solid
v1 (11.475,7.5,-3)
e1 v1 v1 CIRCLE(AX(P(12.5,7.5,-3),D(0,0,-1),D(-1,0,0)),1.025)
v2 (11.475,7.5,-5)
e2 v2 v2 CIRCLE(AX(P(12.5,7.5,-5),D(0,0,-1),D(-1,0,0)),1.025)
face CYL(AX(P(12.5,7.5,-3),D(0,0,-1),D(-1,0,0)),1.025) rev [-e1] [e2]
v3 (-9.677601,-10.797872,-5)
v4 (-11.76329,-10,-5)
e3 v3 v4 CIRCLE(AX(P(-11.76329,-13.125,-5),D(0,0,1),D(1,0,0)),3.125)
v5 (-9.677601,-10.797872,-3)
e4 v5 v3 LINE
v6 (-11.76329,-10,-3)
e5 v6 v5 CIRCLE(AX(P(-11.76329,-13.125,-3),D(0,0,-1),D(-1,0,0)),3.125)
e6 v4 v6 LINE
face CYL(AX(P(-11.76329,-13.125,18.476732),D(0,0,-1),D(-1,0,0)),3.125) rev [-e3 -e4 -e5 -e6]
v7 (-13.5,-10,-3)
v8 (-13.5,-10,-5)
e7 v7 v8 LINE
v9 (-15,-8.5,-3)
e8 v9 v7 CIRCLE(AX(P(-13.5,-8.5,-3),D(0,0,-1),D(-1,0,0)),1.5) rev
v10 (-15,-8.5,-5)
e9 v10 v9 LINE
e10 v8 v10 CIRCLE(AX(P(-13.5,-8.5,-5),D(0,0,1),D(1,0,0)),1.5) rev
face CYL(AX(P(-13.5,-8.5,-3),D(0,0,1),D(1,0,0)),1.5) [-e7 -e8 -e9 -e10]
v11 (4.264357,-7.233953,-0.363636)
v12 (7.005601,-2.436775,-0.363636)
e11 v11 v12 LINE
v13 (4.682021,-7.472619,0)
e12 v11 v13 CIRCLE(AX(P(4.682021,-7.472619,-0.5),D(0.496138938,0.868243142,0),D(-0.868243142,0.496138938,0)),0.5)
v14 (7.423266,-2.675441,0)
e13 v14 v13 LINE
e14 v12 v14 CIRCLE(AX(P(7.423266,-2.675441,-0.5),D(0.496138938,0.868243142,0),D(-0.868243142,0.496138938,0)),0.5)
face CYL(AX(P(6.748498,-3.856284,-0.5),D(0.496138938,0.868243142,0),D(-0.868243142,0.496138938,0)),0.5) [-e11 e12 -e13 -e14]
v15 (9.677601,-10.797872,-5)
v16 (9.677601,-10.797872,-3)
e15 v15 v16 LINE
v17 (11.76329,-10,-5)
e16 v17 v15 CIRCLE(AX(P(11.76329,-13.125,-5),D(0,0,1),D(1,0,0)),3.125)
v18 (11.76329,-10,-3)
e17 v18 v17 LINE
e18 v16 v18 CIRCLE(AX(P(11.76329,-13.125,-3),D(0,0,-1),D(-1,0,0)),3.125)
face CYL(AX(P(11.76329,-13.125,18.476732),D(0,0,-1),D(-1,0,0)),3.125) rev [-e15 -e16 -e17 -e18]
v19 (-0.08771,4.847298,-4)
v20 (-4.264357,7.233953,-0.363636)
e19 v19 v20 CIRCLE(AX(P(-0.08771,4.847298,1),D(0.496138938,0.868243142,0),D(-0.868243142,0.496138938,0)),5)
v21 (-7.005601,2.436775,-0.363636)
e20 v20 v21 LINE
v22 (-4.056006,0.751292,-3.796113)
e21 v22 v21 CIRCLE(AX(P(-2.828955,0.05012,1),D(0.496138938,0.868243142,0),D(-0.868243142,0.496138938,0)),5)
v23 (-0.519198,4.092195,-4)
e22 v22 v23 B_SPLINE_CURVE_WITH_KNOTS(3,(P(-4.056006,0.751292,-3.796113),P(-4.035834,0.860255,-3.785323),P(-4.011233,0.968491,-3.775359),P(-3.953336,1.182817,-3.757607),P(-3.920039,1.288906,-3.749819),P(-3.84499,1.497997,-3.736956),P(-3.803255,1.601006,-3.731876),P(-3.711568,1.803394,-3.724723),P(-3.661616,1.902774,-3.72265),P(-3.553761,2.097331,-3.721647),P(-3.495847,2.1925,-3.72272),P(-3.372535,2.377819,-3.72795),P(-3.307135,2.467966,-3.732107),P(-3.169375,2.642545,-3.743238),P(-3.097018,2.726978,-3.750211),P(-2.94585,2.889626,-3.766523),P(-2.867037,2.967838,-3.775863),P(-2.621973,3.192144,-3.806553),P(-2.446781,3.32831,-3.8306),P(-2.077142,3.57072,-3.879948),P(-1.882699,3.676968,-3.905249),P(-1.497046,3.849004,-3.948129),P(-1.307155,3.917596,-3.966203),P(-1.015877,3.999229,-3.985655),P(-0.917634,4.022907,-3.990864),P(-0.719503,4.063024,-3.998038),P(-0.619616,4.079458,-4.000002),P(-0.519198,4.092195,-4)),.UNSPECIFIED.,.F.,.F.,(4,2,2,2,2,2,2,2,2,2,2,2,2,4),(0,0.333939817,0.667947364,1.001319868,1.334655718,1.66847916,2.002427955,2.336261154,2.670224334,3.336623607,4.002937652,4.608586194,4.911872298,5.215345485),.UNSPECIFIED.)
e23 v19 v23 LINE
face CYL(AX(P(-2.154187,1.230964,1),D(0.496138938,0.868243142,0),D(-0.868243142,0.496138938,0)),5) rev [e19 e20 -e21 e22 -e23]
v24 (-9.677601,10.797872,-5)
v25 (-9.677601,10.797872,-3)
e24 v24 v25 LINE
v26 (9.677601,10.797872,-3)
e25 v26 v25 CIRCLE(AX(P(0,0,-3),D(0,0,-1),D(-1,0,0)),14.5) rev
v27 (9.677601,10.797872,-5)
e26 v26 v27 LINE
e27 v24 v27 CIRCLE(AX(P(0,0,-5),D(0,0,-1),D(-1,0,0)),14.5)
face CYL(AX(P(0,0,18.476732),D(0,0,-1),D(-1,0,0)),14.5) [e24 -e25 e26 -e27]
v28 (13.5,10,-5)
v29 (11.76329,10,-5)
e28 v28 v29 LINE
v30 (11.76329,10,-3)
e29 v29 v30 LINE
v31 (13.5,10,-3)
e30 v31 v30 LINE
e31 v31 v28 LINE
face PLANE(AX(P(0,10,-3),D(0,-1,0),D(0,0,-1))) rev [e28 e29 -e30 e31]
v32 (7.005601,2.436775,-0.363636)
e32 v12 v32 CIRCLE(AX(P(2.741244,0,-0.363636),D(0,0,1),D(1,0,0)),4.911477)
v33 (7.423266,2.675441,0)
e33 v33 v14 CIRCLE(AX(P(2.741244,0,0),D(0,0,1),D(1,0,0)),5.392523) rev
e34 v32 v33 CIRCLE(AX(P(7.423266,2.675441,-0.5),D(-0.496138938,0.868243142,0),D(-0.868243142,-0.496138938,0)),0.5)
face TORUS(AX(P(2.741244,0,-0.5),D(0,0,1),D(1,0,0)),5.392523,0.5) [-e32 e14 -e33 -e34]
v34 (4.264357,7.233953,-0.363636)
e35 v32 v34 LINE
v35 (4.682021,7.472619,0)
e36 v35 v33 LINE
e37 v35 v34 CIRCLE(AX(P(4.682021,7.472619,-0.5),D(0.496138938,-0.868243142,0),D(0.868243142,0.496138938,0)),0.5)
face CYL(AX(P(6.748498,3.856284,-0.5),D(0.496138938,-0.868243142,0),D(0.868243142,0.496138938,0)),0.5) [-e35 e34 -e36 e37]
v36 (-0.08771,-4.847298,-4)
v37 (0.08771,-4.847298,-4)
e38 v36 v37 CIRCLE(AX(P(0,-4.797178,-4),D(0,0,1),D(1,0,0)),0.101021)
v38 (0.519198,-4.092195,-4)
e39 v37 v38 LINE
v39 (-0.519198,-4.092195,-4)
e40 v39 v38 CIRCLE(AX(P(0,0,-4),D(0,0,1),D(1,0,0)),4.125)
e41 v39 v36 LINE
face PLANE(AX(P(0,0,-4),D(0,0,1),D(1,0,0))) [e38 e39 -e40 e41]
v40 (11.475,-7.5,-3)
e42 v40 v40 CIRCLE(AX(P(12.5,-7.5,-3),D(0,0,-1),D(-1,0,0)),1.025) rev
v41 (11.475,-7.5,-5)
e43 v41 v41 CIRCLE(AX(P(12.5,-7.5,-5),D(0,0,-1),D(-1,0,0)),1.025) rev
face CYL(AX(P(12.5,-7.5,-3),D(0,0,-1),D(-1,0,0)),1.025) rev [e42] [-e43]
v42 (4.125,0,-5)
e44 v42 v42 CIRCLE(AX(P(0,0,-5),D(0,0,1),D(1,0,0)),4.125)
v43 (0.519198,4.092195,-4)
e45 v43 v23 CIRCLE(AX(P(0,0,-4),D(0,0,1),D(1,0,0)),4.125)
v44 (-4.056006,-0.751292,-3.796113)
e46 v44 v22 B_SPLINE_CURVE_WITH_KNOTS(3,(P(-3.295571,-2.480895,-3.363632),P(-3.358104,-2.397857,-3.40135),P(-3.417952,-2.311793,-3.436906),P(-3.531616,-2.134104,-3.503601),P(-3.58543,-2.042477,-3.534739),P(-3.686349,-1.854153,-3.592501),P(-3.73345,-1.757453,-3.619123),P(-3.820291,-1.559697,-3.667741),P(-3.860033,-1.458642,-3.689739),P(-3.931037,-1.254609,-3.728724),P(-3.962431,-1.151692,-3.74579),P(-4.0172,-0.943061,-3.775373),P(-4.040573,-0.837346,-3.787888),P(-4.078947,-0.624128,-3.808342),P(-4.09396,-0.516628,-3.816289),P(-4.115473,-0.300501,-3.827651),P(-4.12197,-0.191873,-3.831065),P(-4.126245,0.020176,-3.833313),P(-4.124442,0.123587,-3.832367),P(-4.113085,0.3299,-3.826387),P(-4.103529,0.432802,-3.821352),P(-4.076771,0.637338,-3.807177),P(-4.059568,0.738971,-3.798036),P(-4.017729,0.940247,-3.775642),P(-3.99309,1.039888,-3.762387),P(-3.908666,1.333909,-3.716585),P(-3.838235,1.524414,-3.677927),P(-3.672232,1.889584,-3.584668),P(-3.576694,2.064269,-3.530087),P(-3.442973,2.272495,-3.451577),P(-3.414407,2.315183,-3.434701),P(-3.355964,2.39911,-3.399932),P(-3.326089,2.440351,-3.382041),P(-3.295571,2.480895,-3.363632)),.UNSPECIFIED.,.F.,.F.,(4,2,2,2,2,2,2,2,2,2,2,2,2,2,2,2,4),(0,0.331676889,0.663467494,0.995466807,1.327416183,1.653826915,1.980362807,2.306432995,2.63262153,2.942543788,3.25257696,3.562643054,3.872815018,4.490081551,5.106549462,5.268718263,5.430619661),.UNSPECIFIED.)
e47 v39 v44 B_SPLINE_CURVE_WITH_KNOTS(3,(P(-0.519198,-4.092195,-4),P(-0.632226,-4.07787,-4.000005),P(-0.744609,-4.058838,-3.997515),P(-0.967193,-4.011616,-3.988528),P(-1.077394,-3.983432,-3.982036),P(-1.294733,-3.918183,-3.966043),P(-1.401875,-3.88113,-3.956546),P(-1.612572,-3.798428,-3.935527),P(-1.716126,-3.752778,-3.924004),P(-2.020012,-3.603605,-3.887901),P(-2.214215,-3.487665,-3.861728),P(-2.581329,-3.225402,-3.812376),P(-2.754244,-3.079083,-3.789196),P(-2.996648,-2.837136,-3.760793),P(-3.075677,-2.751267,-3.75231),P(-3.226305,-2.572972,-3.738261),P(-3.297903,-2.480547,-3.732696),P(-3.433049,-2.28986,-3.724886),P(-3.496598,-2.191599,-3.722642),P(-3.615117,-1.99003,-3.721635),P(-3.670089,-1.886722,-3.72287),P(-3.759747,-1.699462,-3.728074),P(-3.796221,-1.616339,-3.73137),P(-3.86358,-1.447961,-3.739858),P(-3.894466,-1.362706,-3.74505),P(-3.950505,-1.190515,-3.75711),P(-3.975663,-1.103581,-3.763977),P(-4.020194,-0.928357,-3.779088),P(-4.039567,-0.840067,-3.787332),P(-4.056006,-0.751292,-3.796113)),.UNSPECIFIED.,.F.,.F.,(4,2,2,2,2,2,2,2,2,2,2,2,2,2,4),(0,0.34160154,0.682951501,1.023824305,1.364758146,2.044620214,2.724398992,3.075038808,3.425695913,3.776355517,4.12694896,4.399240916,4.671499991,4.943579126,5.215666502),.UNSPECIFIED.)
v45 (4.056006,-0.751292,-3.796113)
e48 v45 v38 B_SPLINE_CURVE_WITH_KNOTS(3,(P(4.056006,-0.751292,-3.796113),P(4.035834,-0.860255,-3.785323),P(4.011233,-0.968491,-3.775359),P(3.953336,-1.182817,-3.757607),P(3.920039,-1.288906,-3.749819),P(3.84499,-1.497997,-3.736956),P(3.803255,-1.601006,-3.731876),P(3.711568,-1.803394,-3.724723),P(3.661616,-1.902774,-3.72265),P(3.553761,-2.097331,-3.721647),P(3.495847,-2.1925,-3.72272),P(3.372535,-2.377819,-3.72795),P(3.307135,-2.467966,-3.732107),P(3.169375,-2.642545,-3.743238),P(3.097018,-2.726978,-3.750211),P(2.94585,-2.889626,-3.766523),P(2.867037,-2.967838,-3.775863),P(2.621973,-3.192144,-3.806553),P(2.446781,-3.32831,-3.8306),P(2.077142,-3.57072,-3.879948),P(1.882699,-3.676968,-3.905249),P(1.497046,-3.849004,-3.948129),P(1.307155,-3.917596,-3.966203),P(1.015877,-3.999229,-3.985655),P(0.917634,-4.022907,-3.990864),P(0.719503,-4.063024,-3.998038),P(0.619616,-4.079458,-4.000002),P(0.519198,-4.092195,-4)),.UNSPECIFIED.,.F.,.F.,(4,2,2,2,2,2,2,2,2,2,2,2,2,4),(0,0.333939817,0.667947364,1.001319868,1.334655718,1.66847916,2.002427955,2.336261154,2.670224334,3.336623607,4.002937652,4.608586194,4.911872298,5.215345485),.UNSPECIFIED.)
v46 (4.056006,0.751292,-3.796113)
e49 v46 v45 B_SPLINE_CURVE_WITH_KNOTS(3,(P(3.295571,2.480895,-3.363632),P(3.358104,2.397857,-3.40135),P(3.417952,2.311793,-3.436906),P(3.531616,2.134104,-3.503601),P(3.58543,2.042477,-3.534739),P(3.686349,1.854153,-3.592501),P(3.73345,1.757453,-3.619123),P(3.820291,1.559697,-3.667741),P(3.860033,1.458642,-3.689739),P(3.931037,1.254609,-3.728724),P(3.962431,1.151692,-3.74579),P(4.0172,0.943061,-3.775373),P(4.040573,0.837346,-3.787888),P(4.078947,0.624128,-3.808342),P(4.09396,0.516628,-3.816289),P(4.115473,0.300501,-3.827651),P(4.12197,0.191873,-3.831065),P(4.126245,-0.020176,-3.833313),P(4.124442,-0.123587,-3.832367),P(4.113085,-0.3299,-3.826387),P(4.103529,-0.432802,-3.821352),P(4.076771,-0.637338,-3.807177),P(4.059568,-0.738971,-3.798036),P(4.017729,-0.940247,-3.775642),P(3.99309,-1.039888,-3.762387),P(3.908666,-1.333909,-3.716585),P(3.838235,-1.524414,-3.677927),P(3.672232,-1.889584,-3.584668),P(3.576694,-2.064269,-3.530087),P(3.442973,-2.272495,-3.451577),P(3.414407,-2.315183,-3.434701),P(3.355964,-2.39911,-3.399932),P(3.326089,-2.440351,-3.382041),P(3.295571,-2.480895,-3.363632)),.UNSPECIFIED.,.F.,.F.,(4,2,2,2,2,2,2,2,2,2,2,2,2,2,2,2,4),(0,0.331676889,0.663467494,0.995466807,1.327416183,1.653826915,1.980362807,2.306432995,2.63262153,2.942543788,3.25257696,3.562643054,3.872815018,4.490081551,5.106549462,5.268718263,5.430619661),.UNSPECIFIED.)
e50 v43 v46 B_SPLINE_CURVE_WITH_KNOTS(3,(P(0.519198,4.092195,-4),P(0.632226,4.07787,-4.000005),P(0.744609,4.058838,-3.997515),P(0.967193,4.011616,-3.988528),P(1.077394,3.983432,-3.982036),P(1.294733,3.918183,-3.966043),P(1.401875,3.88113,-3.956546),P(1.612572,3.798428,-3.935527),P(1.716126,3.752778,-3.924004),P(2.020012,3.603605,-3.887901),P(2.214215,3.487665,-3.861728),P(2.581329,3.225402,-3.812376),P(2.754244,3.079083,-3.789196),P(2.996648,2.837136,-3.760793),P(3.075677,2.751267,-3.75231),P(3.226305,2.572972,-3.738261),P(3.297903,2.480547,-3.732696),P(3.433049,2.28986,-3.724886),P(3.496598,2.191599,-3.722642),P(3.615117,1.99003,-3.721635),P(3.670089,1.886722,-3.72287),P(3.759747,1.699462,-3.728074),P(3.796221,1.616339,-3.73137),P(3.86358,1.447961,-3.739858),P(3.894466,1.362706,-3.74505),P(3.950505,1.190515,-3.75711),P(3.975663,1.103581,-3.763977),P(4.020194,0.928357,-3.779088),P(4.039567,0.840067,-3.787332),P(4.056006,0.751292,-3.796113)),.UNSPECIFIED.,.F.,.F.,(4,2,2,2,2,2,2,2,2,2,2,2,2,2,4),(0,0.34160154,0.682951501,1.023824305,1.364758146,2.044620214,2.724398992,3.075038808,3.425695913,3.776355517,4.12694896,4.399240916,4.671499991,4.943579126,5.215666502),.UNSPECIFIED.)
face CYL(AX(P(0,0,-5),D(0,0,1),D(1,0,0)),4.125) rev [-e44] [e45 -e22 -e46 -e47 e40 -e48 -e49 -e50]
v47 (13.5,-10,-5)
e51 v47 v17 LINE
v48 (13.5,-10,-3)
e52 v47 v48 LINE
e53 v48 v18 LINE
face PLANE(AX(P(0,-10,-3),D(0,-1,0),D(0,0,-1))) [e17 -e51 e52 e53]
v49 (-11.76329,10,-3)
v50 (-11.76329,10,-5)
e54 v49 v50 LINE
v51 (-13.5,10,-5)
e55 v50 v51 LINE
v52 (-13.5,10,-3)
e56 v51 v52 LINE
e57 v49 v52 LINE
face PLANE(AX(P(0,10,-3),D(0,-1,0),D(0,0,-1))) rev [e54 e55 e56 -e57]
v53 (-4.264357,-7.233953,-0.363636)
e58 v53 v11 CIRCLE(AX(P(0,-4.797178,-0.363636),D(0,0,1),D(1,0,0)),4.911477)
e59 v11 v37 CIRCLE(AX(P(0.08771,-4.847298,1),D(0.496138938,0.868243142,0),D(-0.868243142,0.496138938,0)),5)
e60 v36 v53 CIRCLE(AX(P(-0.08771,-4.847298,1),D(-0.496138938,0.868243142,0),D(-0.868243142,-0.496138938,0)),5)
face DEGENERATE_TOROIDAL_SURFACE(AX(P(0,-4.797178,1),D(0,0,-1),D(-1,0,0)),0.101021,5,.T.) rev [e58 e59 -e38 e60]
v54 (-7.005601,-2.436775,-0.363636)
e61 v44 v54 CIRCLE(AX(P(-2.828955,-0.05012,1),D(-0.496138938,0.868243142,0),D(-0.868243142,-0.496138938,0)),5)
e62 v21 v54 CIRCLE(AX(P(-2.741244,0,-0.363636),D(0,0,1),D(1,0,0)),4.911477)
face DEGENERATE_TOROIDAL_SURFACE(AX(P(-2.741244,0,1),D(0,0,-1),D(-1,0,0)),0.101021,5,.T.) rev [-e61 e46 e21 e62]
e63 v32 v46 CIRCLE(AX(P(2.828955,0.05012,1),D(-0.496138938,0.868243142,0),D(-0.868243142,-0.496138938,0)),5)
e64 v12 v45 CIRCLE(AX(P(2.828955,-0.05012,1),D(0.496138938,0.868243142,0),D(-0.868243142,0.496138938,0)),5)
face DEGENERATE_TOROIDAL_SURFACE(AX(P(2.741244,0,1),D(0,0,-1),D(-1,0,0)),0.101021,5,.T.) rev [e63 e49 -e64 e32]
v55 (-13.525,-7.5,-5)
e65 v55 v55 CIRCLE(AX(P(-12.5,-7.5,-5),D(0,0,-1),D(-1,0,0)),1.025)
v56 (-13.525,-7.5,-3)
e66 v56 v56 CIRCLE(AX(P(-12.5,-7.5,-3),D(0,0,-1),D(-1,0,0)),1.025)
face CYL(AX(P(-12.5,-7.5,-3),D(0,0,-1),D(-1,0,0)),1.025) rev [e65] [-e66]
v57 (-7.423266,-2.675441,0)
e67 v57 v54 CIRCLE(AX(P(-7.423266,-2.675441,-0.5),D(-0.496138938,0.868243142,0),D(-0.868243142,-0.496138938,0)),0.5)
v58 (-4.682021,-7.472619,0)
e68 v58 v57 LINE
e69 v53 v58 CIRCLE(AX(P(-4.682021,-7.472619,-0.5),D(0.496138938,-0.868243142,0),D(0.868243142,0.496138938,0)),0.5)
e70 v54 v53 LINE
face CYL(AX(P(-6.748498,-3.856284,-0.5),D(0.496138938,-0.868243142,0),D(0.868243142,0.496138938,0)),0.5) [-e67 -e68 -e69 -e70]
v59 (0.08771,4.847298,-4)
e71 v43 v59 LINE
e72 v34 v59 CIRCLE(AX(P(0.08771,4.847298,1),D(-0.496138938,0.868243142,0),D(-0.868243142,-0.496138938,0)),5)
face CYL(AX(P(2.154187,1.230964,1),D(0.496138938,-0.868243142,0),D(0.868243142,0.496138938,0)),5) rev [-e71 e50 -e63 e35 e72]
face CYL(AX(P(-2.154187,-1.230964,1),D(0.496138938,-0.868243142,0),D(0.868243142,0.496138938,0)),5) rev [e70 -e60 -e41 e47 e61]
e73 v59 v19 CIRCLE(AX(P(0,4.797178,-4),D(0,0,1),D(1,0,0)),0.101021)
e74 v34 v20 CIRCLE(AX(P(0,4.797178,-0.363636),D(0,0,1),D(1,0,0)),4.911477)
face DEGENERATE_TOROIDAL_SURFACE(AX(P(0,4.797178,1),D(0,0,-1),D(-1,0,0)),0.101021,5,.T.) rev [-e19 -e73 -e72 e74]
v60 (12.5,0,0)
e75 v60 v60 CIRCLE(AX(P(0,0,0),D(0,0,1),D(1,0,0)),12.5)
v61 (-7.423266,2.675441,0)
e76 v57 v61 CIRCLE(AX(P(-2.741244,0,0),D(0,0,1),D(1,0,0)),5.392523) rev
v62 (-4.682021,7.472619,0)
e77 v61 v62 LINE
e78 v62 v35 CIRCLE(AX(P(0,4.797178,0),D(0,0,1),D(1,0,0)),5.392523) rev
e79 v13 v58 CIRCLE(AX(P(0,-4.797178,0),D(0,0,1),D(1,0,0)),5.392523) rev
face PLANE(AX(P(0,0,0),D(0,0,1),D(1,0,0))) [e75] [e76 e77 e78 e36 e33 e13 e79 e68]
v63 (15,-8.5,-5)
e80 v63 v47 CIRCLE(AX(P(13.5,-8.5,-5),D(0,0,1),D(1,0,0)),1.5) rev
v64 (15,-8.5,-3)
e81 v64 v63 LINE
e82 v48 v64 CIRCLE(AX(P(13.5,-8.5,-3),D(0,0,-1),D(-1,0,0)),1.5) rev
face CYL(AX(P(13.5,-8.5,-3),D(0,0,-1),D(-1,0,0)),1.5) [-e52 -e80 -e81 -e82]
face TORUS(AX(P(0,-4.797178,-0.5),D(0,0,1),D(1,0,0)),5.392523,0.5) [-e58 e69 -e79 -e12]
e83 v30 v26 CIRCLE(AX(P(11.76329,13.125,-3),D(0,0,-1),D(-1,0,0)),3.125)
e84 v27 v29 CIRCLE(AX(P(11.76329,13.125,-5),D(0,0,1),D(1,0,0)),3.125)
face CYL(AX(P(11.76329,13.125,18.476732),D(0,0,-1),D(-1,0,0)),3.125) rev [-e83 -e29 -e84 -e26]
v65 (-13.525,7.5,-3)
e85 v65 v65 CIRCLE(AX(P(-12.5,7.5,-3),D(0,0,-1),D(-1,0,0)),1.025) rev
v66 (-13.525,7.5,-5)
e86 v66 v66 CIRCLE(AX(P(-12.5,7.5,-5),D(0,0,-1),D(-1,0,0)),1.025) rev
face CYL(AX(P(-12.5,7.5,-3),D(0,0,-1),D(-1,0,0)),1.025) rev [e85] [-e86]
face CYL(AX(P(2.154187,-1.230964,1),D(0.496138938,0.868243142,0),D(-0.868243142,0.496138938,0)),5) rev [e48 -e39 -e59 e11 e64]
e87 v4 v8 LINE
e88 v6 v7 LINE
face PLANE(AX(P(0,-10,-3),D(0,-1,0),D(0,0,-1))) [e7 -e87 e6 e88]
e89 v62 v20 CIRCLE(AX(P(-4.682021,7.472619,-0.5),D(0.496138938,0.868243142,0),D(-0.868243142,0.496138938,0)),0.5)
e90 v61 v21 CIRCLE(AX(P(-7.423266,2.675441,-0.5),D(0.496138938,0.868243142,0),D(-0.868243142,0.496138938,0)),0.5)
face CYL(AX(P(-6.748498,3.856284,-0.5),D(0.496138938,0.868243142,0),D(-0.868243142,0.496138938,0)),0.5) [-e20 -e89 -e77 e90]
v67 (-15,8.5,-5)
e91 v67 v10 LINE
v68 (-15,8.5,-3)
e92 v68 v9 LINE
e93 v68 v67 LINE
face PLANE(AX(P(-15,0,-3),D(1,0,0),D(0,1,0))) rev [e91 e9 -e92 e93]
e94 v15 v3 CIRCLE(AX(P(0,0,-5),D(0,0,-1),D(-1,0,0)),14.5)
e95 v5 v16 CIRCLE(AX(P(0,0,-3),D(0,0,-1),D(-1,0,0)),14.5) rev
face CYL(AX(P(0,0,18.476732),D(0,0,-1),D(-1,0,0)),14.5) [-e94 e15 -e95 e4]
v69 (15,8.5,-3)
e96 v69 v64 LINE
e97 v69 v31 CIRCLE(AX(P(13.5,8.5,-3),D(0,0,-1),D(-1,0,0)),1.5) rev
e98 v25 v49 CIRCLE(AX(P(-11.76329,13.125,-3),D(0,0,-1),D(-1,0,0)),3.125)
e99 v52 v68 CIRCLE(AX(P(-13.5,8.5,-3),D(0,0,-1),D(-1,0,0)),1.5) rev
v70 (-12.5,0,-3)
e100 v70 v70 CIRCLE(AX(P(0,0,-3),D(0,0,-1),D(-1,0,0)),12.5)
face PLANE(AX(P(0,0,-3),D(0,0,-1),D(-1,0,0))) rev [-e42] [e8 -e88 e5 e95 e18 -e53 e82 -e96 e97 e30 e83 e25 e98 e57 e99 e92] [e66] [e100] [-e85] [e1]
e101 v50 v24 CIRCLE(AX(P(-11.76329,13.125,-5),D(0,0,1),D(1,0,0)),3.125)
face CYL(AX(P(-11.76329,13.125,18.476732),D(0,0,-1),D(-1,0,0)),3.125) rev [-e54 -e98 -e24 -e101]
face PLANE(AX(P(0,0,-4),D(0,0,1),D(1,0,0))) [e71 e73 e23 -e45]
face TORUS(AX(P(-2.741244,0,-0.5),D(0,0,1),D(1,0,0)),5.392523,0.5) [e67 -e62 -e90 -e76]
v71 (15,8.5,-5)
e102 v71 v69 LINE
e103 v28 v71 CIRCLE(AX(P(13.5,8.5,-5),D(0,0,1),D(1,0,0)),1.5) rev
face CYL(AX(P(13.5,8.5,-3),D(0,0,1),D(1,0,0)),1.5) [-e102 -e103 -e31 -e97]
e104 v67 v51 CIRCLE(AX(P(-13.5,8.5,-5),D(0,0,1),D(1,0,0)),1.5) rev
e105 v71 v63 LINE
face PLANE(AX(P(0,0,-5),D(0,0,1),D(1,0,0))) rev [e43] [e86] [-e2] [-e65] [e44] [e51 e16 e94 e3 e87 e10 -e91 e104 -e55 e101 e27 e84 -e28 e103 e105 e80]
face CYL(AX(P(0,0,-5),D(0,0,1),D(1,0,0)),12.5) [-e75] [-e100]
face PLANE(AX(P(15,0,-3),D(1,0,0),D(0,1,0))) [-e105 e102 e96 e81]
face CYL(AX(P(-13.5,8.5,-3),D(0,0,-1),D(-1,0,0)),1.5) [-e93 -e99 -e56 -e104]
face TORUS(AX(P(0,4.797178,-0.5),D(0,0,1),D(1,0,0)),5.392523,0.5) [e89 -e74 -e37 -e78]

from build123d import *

# Parameters (mm, degrees)
SKETCH1_R           = 15
BOSS_EXTRUDE1_DEPTH = 5
CUT_EXTRUDE1_DEPTH  = 4
FILLET1_R           = 5
FILLET2_R           = 5
SKETCH4_R           = 4.125
CUT_EXTRUDE2_DEPTH  = 22.794494718
SKETCH7_R           = 15
SKETCH7_R_2         = 12.5
CUT_EXTRUDE3_DEPTH  = 22.794494741
BOSS_EXTRUDE4_START = -2
SKETCH10_R          = 1.025
BOSS_EXTRUDE4_DEPTH = 2
FILLET5_R           = 1.5
BOSS_EXTRUDE5_START = -2
BOSS_EXTRUDE5_DEPTH = 2
FILLET6_R           = 3.125
FILLET7_R           = 0.5


with BuildPart() as part:
    # Sketch1 → Boss-Extrude1 (new body)
    with BuildSketch(Plane.XY):
        Circle(SKETCH1_R)
    extrude(amount=-BOSS_EXTRUDE1_DEPTH)

    # Sketch3 → Cut-Extrude1 (cut)
    with BuildSketch(Plane.XY):
        Polygon((8.5, 0), (0, 14.875), (-8.5, 0), (0, -14.875), align=None)
    extrude(amount=-CUT_EXTRUDE1_DEPTH, mode=Mode.SUBTRACT)

    # Fillet1
    fillet1_edges = [part.edges().sort_by_distance(p)[0] for p in [
        (0, 14.875, -2),
        (8.5, 0, -2),
        (0, -14.875, -2),
        (-8.5, 0, -2),
    ]]
    fillet(fillet1_edges, radius=FILLET1_R)

    # Fillet2
    # the kernel refuses this fillet: 5 mm, written as the material it adds along each edge
    with BuildSketch(Plane(origin=(0, -4.797177815, -4), x_dir=(-0.8682431421244594, -0.4961389383568335, 0), z_dir=(-0.4961389383568335, 0.8682431421244594, 0))) as fillet2_piece_1:
        with BuildLine():
            CenterArc((0.101020514, 5), FILLET2_R, 270, 78.463040967)
            Line((0.101020514, 0), (0.101020514, -0.1))
            Line((0.101020514, -0.1), (5, -0.1))
            Line((5, -0.1), (5.1, 0))
            ThreePointArc((5.1, 0), (5.1, 2), (5.09797959, 3.98))
            Line((5.09797959, 3.98), (5, 4))
        make_face()
    revolve(axis=Axis((0, -4.797177815, -4), (0, 0, 1)), revolution_arc=120.510237406)
    with BuildSketch(Plane(origin=(-7.082460176, -2.480694692, -4), x_dir=(1.3436192329677e-12, 7.677824188386856e-13, 1.0), z_dir=(0.49613893835683387, -0.8682431421244593, 0)), Plane(origin=(-4.341215711, 7.277872506, -4), x_dir=(1.3880008253859177e-12, -7.93143328791953e-13, 1.0), z_dir=(-0.49613893835683387, -0.8682431421244591, 0)), Plane(origin=(7.082460176, 2.480694692, -4), x_dir=(-1.3700903659455922e-12, -7.829087805403382e-13, 1.0), z_dir=(-0.49613893835683376, 0.8682431421244593, 0)), Plane(origin=(4.341215711, -7.277872506, -4), x_dir=(-1.3859204382413136e-12, 7.919545361378934e-13, 1.0), z_dir=(0.49613893835683387, 0.8682431421244593, 0))) as fillet2_piece_2:
        with BuildLine():
            CenterArc((5, -4.898979486), FILLET2_R, 101.536959033, 78.463040967)
            Line((0, -4.898979486), (-0.1, -4.898979486))
            Line((-0.1, -4.898979486), (-0.1, 0))
            Line((-0.1, 0), (0, 0.1))
            ThreePointArc((0, 0.1), (2, 0.1), (3.98, 0.09797959))
            Line((3.98, 0.09797959), (4, 0))
        make_face()
    extrude(amount=5.525154858)
    with BuildSketch(Plane(origin=(-2.741244466, 0, -4), x_dir=(-0.8682431421244594, 0.4961389383568336, 0), z_dir=(0.4961389383568336, 0.8682431421244594, 0))) as fillet2_piece_3:
        with BuildLine():
            CenterArc((0.101020514, 5), FILLET2_R, 270, 78.463040967)
            Line((0.101020514, 0), (0.101020514, -0.1))
            Line((0.101020514, -0.1), (5, -0.1))
            Line((5, -0.1), (5.1, 0))
            ThreePointArc((5.1, 0), (5.1, 2), (5.09797959, 3.98))
            Line((5.09797959, 3.98), (5, 4))
        make_face()
    revolve(axis=Axis((-2.741244466, 0, -4), (0, 0, 1)), revolution_arc=59.489762594)
    with BuildSketch(Plane(origin=(0, 4.797177815, -4), x_dir=(0.8682431421244594, 0.4961389383568332, 0), z_dir=(0.4961389383568332, -0.8682431421244594, 0))) as fillet2_piece_4:
        with BuildLine():
            CenterArc((0.101020514, 5), FILLET2_R, 270, 78.463040967)
            Line((0.101020514, 0), (0.101020514, -0.1))
            Line((0.101020514, -0.1), (5, -0.1))
            Line((5, -0.1), (5.1, 0))
            ThreePointArc((5.1, 0), (5.1, 2), (5.09797959, 3.98))
            Line((5.09797959, 3.98), (5, 4))
        make_face()
    revolve(axis=Axis((0, 4.797177815, -4), (0, 0, 1)), revolution_arc=120.510237406)
    with BuildSketch(Plane(origin=(2.741244466, 0, -4), x_dir=(0.8682431421244592, 0.49613893835683376, 0), z_dir=(-0.49613893835683376, 0.8682431421244592, 0))) as fillet2_piece_5:
        with BuildLine():
            CenterArc((0.101020514, -5), FILLET2_R, 11.536959033, 78.463040967)
            Line((0.101020514, 0), (0.101020514, 0.1))
            Line((0.101020514, 0.1), (5, 0.1))
            Line((5, 0.1), (5.1, 0))
            ThreePointArc((5.1, 0), (5.1, -2), (5.09797959, -3.98))
            Line((5.09797959, -3.98), (5, -4))
        make_face()
    revolve(axis=Axis((2.741244466, 0, -4), (0, 0, -1)), revolution_arc=59.489762594)

    # Sketch4 → Cut-Extrude2 (cut, through all)
    with BuildSketch(Plane.XY):
        Circle(SKETCH4_R)
    extrude(amount=-CUT_EXTRUDE2_DEPTH, mode=Mode.SUBTRACT)

    # Sketch7 → Cut-Extrude3 (cut, through all)
    with BuildSketch(Plane.XY):
        Circle(SKETCH7_R)
        Circle(SKETCH7_R_2, mode=Mode.SUBTRACT)
    extrude(amount=-CUT_EXTRUDE3_DEPTH, mode=Mode.SUBTRACT)

    # Sketch10 → Boss-Extrude4 (add)
    # profile 1 of 2: a face of its own
    with BuildSketch(Plane(origin=(0, 0, -5), x_dir=(-1, 0, 0), z_dir=(0, 0, -1)).offset(BOSS_EXTRUDE4_START)):
        with BuildLine():
            Line((15, 10), (7.5, 10))
            ThreePointArc((7.5, 10), (11.180339887, 5.590169944), (12.5, 0))
            ThreePointArc((12.5, 0), (11.180339887, -5.590169944), (7.5, -10))
            Line((7.5, -10), (15, -10))
            Line((15, -10), (15, 10))
        make_face()
        with Locations((12.5, -7.5)):
            Circle(SKETCH10_R, mode=Mode.SUBTRACT)
        with Locations((12.5, 7.5)):
            Circle(SKETCH10_R, mode=Mode.SUBTRACT)
    # profile 2 of 2: a face of its own
    with BuildSketch(Plane(origin=(0, 0, -5), x_dir=(-1, 0, 0), z_dir=(0, 0, -1)).offset(BOSS_EXTRUDE4_START)):
        with BuildLine():
            Line((-7.5, 10), (-15, 10))
            Line((-15, 10), (-15, -10))
            Line((-15, -10), (-7.5, -10))
            ThreePointArc((-7.5, -10), (-12.5, 0), (-7.5, 10))
        make_face()
        with Locations((-12.5, -7.5)):
            Circle(SKETCH10_R, mode=Mode.SUBTRACT)
        with Locations((-12.5, 7.5)):
            Circle(SKETCH10_R, mode=Mode.SUBTRACT)
    extrude(amount=BOSS_EXTRUDE4_DEPTH)

    # Fillet5
    fillet5_edges = [part.edges().sort_by_distance(p)[0] for p in [
        (15, -10, -4),
        (15, 10, -4),
        (-15, 10, -4),
        (-15, -10, -4),
    ]]
    fillet(fillet5_edges, radius=FILLET5_R)

    # Sketch11 → Boss-Extrude5 (add)
    with BuildSketch(Plane(origin=(0, 0, -5), x_dir=(-1, 0, 0), z_dir=(0, 0, -1)).offset(BOSS_EXTRUDE5_START)):
        with BuildLine():
            ThreePointArc((-7.5, 10), (0, 12.5), (7.5, 10))
            Line((7.5, 10), (10.5, 10))
            ThreePointArc((10.5, 10), (0, 14.5), (-10.5, 10))
            Line((-10.5, 10), (-7.5, 10))
        make_face()
        with BuildLine():
            Line((10.5, -10), (7.5, -10))
            ThreePointArc((7.5, -10), (0, -12.5), (-7.5, -10))
            Line((-7.5, -10), (-10.5, -10))
            ThreePointArc((-10.5, -10), (0, -14.5), (10.5, -10))
        make_face()
    extrude(amount=BOSS_EXTRUDE5_DEPTH)

    # Fillet6
    fillet6_edges = [part.edges().sort_by_distance(p)[0] for p in [
        (-10.5, 10, -4),
        (10.5, 10, -4),
        (10.5, -10, -4),
        (-10.5, -10, -4),
    ]]
    fillet(fillet6_edges, radius=FILLET6_R)

    # Fillet7
    fillet7_edges = [part.edges().sort_by_distance(p)[0] for p in [
        (5.711837943, 4.879283599, 0),
        (5.711837943, -4.879283599, 0),
        (-5.711837943, -4.879283599, 0),
        (-5.711837943, 4.879283599, 0),
        (7.741244466, 0, 0),
        (0, -9.797177815, 0),
        (-7.741244466, 0, 0),
        (0, 9.797177815, 0),
    ]]
    fillet(fillet7_edges, radius=FILLET7_R)


solid = part.part
